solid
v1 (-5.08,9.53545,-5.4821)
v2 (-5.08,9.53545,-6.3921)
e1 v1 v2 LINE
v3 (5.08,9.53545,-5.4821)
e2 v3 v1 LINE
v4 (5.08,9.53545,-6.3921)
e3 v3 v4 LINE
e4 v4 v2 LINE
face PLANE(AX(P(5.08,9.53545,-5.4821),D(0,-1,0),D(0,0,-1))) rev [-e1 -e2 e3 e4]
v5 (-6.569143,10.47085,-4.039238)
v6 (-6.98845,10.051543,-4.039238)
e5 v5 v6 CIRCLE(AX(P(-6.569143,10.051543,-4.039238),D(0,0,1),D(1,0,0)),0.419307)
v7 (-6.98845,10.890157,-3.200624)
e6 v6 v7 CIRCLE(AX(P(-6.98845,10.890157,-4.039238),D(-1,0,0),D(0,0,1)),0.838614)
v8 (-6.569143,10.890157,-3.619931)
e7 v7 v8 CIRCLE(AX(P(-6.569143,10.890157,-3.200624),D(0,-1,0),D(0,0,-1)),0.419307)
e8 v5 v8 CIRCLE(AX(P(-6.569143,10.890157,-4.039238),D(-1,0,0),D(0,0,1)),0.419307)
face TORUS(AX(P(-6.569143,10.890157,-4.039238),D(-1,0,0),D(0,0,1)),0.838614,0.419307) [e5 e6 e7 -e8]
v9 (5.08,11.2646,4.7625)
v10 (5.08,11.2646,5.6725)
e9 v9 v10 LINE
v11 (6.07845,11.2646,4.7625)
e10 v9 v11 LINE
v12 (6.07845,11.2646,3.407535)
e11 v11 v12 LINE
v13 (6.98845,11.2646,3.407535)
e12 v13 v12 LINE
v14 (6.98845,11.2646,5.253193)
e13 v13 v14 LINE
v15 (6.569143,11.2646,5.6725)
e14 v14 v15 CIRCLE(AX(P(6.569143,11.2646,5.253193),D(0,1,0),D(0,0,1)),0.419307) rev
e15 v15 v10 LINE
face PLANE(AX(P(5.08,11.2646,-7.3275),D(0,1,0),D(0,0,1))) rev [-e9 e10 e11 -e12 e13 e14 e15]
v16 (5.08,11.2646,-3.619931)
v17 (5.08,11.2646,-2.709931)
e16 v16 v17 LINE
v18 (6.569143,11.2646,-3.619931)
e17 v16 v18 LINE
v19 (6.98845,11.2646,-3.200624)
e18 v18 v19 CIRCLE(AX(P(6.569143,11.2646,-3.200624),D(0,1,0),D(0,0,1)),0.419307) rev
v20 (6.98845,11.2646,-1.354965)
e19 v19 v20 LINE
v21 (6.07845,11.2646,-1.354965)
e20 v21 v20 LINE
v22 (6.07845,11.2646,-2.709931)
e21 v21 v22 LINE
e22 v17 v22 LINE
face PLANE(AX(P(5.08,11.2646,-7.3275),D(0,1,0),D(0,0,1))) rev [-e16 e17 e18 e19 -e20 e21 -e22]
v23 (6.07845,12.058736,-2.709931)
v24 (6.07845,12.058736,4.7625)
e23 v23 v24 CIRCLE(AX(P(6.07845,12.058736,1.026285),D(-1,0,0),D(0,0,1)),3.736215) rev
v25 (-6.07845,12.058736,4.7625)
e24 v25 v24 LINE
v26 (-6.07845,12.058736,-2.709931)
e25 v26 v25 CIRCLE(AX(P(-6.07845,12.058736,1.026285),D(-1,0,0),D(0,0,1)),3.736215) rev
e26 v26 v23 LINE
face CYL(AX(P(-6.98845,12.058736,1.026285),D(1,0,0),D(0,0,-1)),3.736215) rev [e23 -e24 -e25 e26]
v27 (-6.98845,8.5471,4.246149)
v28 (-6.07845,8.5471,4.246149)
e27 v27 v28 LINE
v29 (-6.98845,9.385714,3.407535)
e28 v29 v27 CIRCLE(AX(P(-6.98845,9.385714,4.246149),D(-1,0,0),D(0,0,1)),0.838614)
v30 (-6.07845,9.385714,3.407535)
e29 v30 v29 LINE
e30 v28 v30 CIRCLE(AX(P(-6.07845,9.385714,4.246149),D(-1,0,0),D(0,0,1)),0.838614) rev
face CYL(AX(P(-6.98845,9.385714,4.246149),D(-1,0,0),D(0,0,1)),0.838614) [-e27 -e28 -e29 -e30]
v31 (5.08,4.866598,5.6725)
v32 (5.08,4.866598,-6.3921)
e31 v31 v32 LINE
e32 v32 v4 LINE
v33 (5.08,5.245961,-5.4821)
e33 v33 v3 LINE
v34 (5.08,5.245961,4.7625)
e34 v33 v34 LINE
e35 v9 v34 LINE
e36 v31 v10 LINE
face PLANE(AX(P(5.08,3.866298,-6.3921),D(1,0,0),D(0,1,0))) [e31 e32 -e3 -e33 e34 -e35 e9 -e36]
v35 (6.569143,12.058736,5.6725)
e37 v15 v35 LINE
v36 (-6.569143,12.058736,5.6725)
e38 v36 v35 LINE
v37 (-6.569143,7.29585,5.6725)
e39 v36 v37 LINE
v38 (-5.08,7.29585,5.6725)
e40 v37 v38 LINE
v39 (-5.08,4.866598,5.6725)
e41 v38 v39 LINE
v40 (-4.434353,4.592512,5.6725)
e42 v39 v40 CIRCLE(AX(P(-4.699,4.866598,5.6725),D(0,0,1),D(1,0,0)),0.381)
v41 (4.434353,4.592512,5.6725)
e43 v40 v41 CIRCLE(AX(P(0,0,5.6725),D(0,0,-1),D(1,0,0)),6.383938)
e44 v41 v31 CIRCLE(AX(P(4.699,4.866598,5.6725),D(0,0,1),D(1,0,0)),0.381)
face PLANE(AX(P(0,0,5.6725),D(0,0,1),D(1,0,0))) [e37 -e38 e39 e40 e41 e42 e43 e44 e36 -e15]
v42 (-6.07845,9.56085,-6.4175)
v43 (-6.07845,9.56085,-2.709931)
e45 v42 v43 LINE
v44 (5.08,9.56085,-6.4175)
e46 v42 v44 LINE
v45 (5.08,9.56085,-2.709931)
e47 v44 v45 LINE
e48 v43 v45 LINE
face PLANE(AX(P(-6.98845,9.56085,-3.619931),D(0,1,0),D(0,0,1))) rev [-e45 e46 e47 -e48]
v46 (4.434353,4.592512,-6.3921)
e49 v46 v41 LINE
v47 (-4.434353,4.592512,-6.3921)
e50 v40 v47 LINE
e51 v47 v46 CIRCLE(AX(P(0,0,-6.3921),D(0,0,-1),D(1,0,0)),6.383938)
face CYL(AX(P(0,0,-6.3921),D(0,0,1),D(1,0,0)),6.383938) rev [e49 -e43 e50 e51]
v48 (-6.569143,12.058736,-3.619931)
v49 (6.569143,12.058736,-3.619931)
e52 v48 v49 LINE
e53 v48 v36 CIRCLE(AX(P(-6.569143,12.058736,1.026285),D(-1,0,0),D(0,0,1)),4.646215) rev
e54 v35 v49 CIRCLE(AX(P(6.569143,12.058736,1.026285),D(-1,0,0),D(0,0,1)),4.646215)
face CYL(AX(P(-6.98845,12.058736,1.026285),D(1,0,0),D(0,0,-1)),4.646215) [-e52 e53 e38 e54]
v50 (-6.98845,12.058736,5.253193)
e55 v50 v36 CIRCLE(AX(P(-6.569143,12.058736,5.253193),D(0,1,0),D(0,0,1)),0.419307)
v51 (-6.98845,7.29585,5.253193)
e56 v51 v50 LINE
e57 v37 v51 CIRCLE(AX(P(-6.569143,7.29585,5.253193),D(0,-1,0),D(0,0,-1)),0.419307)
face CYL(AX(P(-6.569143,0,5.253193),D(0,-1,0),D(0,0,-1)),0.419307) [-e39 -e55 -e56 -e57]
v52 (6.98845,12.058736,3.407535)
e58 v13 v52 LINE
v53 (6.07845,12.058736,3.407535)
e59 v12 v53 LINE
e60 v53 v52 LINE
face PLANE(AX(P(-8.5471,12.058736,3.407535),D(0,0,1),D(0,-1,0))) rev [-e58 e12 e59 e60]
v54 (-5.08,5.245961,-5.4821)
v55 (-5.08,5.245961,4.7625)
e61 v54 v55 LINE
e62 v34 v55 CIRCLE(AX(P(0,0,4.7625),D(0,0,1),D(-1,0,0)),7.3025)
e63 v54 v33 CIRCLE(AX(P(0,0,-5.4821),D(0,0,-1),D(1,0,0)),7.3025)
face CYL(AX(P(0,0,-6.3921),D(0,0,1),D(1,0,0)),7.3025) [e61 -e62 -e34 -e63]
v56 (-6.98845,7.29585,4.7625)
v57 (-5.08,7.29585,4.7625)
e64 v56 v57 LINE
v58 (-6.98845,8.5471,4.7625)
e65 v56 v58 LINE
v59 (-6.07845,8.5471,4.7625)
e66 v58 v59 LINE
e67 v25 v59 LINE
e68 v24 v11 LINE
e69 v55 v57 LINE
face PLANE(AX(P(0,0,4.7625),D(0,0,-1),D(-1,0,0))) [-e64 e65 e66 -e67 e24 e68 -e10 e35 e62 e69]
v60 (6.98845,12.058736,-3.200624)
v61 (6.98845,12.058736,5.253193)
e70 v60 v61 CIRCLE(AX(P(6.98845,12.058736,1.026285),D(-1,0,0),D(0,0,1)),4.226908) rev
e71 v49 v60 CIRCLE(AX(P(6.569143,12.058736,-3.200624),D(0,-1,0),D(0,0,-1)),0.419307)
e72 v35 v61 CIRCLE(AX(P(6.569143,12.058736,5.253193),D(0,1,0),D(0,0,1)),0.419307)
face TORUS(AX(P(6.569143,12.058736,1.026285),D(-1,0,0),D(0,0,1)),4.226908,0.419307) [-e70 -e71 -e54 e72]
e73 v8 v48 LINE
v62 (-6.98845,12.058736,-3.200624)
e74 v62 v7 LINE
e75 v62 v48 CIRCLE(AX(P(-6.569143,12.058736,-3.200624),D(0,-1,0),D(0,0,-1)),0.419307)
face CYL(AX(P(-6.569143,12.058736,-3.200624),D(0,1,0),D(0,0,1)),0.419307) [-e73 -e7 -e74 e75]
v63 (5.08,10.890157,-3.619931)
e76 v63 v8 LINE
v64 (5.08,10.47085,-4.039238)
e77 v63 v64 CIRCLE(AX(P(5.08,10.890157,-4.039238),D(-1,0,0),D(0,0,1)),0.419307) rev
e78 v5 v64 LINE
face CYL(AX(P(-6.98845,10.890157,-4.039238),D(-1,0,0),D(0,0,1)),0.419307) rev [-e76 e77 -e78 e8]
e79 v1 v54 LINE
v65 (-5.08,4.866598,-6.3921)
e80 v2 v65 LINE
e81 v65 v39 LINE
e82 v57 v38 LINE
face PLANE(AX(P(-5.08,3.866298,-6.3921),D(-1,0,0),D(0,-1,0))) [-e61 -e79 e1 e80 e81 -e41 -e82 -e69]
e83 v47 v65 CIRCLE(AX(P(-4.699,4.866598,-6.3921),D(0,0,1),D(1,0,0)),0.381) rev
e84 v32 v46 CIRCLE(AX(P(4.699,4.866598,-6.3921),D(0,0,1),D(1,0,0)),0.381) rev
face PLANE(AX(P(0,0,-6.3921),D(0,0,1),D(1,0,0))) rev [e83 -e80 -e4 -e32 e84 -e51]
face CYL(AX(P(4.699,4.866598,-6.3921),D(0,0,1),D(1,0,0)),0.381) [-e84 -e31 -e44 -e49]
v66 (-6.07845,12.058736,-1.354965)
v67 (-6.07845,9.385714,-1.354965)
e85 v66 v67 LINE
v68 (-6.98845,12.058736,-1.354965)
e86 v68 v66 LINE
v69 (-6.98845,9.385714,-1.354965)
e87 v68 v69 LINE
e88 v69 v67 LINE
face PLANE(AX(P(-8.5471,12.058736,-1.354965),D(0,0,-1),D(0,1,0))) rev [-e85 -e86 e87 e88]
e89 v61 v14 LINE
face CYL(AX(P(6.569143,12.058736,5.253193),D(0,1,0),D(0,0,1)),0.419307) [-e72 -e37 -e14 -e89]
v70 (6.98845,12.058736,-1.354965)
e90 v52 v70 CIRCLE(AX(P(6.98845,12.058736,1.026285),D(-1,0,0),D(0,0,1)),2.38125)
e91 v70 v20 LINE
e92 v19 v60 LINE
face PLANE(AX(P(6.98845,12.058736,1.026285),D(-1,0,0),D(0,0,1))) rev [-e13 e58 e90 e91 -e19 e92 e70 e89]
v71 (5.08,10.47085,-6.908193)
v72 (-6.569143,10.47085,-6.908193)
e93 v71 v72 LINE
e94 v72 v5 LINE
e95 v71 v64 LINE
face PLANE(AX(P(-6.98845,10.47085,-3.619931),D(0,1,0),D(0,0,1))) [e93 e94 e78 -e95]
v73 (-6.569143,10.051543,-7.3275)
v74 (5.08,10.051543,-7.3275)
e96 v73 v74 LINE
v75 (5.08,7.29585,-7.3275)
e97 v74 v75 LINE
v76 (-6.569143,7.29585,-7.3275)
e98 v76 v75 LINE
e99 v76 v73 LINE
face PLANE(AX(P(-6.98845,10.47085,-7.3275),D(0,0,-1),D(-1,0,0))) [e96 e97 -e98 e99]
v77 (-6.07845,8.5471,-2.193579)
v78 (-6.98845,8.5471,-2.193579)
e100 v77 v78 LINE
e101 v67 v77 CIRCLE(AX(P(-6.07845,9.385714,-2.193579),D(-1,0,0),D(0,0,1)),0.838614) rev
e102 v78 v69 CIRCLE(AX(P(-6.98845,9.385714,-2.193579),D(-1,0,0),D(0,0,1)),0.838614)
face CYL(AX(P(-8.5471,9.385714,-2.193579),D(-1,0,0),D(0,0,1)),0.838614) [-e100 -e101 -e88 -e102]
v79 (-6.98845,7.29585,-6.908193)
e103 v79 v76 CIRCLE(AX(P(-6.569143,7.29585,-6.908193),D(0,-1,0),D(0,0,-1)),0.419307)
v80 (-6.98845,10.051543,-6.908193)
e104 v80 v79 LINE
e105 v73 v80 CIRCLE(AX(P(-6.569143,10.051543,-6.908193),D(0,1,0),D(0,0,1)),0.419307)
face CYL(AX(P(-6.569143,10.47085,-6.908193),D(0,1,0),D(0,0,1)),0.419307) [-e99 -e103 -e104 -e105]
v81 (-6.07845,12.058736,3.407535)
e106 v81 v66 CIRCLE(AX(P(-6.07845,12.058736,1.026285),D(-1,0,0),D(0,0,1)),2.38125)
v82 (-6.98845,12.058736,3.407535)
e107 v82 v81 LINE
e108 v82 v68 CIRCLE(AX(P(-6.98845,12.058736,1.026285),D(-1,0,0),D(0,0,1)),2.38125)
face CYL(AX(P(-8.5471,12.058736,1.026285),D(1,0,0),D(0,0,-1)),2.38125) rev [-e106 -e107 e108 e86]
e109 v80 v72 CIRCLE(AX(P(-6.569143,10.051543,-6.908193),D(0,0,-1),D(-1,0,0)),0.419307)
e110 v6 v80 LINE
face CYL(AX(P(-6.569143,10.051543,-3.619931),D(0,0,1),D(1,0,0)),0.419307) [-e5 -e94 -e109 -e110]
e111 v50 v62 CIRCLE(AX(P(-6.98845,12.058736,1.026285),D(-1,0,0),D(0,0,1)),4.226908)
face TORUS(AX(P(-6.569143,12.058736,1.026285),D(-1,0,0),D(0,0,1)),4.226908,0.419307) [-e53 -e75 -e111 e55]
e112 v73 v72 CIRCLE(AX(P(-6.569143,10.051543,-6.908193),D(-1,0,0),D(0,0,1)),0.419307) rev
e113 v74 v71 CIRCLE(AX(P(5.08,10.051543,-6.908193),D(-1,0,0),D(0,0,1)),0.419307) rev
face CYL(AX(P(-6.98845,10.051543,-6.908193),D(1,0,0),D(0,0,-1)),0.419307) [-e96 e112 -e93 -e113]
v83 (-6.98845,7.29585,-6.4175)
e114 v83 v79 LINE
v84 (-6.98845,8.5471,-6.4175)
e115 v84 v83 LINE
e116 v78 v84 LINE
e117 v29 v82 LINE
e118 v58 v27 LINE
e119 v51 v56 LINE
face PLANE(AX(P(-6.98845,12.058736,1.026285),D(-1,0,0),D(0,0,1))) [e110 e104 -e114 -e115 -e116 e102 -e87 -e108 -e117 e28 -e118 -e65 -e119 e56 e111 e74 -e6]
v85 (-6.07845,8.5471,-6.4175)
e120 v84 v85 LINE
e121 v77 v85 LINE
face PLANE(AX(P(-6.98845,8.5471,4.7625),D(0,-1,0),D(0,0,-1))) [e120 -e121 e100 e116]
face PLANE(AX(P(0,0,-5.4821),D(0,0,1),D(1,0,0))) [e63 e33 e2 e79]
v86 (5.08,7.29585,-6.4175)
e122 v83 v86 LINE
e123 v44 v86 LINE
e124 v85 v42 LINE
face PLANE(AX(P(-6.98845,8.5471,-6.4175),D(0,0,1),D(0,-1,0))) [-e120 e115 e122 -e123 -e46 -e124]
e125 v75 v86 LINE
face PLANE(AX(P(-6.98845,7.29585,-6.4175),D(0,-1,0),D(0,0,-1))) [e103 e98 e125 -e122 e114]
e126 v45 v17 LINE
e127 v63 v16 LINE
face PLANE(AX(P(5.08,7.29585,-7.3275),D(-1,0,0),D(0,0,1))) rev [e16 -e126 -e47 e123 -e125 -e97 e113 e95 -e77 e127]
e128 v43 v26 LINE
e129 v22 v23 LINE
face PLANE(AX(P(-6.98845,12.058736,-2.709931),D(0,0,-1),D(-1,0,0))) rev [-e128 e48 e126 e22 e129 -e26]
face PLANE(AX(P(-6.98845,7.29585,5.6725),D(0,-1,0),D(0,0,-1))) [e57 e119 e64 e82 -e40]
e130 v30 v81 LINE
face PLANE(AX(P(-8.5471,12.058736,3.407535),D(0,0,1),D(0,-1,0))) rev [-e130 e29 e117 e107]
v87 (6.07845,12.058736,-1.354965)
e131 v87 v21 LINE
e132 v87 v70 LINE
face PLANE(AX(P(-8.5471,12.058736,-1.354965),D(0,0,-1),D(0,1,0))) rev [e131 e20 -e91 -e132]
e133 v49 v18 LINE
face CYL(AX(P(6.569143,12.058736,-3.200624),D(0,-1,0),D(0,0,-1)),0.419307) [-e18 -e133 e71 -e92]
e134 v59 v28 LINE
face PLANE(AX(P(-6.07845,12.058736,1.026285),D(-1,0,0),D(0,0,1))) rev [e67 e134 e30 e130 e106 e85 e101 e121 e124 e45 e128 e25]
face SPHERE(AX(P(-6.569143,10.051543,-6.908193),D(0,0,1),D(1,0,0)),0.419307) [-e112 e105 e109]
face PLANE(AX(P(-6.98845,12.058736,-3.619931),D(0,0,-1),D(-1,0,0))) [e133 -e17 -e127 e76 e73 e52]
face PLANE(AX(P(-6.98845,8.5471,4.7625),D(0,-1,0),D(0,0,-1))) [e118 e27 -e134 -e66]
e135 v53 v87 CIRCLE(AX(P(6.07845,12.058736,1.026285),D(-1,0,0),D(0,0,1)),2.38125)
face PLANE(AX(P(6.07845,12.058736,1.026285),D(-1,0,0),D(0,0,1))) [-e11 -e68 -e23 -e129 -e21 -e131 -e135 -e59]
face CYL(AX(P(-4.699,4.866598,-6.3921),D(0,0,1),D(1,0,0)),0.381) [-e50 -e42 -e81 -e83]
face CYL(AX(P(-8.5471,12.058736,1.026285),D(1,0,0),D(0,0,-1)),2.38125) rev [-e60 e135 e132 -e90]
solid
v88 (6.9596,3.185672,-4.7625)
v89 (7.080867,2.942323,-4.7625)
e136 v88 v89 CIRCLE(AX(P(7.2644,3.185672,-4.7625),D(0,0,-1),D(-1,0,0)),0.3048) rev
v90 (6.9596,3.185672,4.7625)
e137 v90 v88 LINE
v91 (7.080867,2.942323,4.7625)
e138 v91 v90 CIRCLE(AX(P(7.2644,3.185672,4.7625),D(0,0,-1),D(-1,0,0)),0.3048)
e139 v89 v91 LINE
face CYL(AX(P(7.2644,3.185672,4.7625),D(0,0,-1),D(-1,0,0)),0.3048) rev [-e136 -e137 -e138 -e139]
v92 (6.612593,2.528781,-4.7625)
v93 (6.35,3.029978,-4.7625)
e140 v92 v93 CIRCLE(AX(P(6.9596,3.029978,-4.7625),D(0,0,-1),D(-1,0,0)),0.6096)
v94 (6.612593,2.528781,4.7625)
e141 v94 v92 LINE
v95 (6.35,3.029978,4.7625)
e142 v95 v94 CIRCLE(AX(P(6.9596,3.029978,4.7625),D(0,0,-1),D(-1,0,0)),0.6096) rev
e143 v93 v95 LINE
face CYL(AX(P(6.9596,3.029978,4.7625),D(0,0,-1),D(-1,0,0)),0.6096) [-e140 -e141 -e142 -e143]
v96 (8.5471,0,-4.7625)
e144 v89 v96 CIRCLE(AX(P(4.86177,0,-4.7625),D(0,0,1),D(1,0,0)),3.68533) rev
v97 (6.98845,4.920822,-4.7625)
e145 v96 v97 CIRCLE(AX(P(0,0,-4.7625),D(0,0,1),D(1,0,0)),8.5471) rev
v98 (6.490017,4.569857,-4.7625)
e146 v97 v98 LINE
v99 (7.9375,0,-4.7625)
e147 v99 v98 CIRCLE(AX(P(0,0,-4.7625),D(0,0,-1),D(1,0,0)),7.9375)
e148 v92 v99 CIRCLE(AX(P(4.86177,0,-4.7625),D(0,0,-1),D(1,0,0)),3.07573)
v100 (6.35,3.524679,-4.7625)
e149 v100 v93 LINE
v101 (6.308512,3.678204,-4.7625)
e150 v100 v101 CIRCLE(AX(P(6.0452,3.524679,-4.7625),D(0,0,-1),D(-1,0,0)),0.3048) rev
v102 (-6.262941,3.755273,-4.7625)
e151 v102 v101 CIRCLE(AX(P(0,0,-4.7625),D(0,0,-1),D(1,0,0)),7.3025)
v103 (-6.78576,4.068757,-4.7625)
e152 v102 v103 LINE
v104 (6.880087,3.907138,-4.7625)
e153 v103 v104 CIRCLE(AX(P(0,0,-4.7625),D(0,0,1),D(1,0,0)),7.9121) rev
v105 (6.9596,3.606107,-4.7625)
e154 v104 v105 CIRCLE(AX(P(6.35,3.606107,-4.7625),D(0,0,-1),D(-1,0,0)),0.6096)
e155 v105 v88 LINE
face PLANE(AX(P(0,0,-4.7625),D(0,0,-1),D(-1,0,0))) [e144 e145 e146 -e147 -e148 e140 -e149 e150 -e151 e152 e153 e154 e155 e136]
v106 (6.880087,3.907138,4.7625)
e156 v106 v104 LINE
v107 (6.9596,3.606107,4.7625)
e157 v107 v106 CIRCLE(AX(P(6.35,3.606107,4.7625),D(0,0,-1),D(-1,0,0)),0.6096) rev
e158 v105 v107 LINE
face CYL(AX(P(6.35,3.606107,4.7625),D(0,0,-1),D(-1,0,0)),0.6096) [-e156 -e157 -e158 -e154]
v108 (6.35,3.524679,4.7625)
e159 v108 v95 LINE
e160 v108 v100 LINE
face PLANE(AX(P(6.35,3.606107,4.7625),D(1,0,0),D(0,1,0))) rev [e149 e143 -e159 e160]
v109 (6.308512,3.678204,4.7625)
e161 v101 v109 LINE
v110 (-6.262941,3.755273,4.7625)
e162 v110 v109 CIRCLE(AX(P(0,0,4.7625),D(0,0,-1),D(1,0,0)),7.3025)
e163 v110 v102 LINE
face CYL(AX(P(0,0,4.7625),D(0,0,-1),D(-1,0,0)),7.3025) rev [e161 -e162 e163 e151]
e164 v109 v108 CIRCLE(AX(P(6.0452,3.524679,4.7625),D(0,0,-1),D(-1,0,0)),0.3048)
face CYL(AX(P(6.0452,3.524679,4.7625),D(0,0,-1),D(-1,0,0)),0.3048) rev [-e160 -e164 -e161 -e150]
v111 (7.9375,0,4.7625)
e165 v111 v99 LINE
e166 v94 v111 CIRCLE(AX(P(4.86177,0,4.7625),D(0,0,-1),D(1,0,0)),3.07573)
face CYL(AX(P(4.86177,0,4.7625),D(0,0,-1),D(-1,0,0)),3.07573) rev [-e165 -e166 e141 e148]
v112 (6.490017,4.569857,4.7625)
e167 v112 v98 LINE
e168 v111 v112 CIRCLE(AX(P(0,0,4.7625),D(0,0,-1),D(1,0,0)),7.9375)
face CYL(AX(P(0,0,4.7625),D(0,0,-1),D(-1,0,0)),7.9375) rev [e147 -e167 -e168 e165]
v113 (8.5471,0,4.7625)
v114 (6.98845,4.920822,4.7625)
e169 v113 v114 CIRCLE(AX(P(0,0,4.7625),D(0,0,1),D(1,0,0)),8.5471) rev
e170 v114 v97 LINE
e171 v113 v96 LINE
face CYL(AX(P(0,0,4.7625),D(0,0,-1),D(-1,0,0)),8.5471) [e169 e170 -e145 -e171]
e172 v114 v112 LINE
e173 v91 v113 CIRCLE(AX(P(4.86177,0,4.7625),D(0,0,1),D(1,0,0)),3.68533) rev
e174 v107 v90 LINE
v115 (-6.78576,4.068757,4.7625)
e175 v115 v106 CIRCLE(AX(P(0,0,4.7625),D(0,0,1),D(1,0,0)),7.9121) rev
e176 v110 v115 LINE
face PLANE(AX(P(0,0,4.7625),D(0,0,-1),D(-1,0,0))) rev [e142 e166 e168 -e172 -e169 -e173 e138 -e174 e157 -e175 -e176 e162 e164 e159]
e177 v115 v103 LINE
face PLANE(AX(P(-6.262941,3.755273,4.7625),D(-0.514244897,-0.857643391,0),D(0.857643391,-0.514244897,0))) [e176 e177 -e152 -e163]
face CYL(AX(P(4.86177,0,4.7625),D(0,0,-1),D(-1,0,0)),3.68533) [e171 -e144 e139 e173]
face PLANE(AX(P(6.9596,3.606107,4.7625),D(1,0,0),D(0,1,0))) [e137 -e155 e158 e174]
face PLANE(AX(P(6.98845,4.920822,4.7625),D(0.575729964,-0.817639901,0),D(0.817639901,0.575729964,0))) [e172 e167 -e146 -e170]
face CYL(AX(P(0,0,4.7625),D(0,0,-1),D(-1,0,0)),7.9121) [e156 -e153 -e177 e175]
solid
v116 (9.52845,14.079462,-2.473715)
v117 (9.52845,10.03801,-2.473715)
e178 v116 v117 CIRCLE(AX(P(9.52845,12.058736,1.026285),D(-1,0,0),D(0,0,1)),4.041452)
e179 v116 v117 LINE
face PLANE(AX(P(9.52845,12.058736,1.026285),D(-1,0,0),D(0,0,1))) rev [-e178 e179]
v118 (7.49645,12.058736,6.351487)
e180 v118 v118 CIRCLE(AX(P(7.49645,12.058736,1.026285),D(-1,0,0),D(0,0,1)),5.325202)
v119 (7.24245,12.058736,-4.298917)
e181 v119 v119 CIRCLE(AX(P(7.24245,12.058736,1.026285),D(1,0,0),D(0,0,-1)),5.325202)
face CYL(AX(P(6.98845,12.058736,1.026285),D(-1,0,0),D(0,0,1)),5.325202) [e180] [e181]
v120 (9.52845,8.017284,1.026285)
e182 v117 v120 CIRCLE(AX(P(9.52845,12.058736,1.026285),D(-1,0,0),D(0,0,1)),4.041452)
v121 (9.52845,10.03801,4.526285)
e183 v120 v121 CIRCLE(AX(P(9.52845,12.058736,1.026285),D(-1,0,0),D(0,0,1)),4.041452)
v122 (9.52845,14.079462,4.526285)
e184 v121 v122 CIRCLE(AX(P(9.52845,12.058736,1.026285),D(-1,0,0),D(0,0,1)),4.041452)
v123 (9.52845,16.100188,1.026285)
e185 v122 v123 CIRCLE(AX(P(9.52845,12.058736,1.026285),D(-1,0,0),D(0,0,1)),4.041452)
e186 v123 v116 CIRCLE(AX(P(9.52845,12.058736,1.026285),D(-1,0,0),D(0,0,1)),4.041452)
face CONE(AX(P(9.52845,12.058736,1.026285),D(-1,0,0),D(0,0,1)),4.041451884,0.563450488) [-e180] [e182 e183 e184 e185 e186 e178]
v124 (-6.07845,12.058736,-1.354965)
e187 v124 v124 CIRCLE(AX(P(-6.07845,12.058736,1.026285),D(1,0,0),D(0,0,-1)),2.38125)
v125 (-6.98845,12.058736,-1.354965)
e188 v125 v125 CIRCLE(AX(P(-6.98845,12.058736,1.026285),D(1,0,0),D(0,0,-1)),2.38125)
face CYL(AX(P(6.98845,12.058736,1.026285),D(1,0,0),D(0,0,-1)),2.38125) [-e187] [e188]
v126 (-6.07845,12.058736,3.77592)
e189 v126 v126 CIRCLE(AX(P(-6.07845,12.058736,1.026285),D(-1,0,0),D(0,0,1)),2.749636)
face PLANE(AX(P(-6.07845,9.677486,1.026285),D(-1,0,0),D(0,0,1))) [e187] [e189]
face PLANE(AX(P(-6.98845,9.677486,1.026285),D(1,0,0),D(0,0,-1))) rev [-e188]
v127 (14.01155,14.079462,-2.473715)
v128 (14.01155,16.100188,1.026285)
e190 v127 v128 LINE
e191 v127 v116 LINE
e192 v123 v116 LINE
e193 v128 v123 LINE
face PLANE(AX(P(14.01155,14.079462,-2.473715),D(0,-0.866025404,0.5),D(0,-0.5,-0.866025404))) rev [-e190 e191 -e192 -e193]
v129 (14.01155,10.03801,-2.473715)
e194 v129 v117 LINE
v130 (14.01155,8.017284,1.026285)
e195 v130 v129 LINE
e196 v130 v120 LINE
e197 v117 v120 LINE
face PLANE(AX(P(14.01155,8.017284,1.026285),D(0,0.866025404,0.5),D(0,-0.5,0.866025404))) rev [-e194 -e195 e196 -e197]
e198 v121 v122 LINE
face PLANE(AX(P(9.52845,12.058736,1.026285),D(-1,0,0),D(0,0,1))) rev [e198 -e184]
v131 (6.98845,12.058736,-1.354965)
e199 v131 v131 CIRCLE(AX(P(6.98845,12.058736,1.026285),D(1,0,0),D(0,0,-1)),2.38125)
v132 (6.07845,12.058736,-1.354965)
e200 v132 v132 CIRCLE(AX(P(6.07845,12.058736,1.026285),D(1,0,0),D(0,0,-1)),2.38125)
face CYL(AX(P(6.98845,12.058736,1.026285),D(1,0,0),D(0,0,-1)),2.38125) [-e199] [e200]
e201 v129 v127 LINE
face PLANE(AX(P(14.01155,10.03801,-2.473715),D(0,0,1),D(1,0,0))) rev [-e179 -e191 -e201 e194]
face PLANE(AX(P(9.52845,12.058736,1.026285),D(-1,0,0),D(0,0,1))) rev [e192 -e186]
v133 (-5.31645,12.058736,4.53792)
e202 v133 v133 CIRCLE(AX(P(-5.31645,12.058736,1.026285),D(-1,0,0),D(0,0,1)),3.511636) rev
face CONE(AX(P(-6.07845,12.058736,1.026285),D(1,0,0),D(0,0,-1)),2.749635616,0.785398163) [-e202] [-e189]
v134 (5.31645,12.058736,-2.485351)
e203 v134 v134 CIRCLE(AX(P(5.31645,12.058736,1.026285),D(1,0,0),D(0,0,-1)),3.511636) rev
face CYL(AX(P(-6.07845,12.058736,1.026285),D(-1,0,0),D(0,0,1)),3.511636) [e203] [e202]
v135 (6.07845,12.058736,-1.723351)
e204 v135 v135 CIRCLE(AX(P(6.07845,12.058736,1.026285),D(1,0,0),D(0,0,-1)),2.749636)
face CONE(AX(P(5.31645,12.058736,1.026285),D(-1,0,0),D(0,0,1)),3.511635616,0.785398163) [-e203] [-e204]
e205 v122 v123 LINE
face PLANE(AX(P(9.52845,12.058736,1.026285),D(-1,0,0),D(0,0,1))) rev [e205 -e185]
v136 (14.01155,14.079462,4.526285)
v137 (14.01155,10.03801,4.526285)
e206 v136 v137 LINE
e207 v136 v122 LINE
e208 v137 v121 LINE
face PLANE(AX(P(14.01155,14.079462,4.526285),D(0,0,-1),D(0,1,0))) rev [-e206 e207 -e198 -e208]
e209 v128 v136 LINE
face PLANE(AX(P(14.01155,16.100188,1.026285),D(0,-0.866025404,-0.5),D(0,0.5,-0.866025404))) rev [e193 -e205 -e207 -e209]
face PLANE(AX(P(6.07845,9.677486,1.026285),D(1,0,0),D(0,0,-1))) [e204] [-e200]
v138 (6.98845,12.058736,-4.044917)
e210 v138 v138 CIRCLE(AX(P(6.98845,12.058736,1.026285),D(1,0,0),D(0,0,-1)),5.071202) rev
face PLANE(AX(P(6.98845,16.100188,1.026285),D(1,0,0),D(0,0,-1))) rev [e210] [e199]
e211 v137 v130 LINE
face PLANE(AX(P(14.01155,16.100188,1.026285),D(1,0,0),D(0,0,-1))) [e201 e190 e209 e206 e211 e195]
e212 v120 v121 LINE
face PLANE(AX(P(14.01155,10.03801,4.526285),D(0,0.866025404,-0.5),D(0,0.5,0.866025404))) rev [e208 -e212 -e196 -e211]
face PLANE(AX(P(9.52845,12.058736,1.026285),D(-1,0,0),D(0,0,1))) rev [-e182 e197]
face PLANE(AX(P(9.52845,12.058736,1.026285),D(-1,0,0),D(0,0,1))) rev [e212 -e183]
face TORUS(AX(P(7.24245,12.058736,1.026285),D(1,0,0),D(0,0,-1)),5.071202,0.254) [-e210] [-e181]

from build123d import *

# Parameters (mm, degrees)
EXTRUDE_THIN1_DEPTH      = 4.7625
BOSS_EXTRUDE1_DEPTH      = 6.98845
BOSS_EXTRUDE1_DEPTH_BACK = 6.98845
SHELL2_START             = -6.07845
SHELL2_DEPTH             = 12.1569
BOSS_EXTRUDE2_DEPTH      = 5.6725
BOSS_EXTRUDE2_DEPTH_BACK = 6.3921
BOSS_EXTRUDE9_START      = -0.91
BOSS_EXTRUDE9_DEPTH      = 0.91
BOSS_EXTRUDE10_START     = 0.91
BOSS_EXTRUDE10_DEPTH     = 0.91
CUT_EXTRUDE3_DEPTH       = 21.144492034
CUT_EXTRUDE3_DEPTH_BACK  = 21.144492034
FILLET3_R                = 0.419307
FILLET8_R                = 0.838614
CHAMFER2_SIZE            = 0.762
SKETCH31_W               = 0.91
SKETCH31_H               = 2.38125
BOSS_EXTRUDE7_DEPTH      = 7.0231
FILLET6_R                = 0.254
CUT_EXTRUDE4_DEPTH       = 24.499299408
CUT_EXTRUDE4_DEPTH_BACK  = 24.499299408
SKETCH35_W               = 1.90845
SKETCH35_H               = 3.96875
FILLET7_R                = 0.381
FILLET9_R                = 0.3048
FILLET10_R               = 0.6096


# Read off the part's stored shape, not the designer's step: Shell2
with BuildPart() as part:
    # Sketch2 → Extrude-Thin1 (new, symmetric)
    with BuildSketch(Plane.XY):
        with BuildLine():
            ThreePointArc((-6.262940862, 3.755273359), (0.086356754, 7.30198937), (6.35, 3.6061068))
            Line((6.35, 3.6061068), (6.35, 2.6917068))
            ThreePointArc((6.35, 2.6917068), (7.511063175, 1.56248534), (7.9375, 0))
            ThreePointArc((7.9375, 0), (-7.566981364, -2.396810231), (6.490016716, 4.569856592))
            Line((6.490016716, 4.569856592), (6.98845, 4.920821579))
            ThreePointArc((6.98845, 4.920821579), (-8.148125533, -2.580885257), (8.5471, 0))
            ThreePointArc((8.5471, 0), (8.126188249, 1.710330505), (6.9596, 3.029977804))
            Line((6.9596, 3.029977804), (6.9596, 3.763680944))
            ThreePointArc((6.9596, 3.763680944), (0.175564575, 7.910151926), (-6.785760274, 4.068757049))
            Line((-6.785760274, 4.068757049), (-6.262940862, 3.755273359))
        make_face()
    extrude(amount=EXTRUDE_THIN1_DEPTH, both=True)

    # Fillet9
    fillet9_edges = [part.edges().sort_by_distance(p)[0] for p in [
        (6.35, 3.6061068, 0),
        (6.9596, 3.029977804, 0),
    ]]
    fillet(fillet9_edges, radius=FILLET9_R)

    # Fillet10
    fillet10_edges = [part.edges().sort_by_distance(p)[0] for p in [
        (6.35, 2.6917068, 0),
        (6.9596, 3.763680944, 0),
    ]]
    fillet(fillet10_edges, radius=FILLET10_R)


with BuildPart() as body_2:
    # Sketch3 → Boss-Extrude1 (new, two sides: drawn at the far end of the back side and taken through both)
    with BuildSketch(Plane(origin=(0, 0, 0), x_dir=(0, 0, -1), z_dir=(1, 0, 0)).offset(-BOSS_EXTRUDE1_DEPTH_BACK)):
        with BuildLine():
            Line((-5.6725, 8.5471), (-5.6725, 7.29585))
            Line((-5.6725, 7.29585), (-4.7625, 7.29585))
            Line((-4.7625, 7.29585), (-4.7625, 8.5471))
            Line((-4.7625, 8.5471), (6.4175, 8.5471))
            Line((6.4175, 8.5471), (6.4175, 7.29585))
            Line((6.4175, 7.29585), (7.3275, 7.29585))
            Line((7.3275, 7.29585), (7.3275, 8.5471))
            Line((7.3275, 8.5471), (7.3275, 10.47085))
            Line((7.3275, 10.47085), (3.619930574, 10.47085))
            Line((3.619930574, 10.47085), (3.619930574, 12.058735616))
            ThreePointArc((3.619930574, 12.058735616), (-1.026284713, 16.704950903), (-5.6725, 12.058735616))
            Line((-5.6725, 12.058735616), (-5.6725, 10.47085))
            Line((-5.6725, 10.47085), (-5.6725, 8.5471))
        make_face()
    extrude(amount=BOSS_EXTRUDE1_DEPTH + BOSS_EXTRUDE1_DEPTH_BACK)

    # Shell2 outline → Shell2 (cut)
    with BuildSketch(Plane.YZ.offset(SHELL2_START)):
        with BuildLine():
            Line((8.5471, -6.4175), (9.56085, -6.4175))
            Line((9.56085, -6.4175), (9.56085, -2.709930574))
            Line((9.56085, -2.709930574), (12.058735616, -2.709930574))
            ThreePointArc((12.058735616, -2.709930574), (15.794950903, 1.026284713), (12.058735616, 4.7625))
            Line((12.058735616, 4.7625), (8.5471, 4.7625))
            Line((8.5471, 4.7625), (8.5471, -6.4175))
        make_face()
    extrude(amount=SHELL2_DEPTH, mode=Mode.SUBTRACT)


with BuildPart() as body_3:
    # Sketch4 → Boss-Extrude2 (new, two sides: drawn at the far end of the back side and taken through both)
    with BuildSketch(Plane.XY.offset(-BOSS_EXTRUDE2_DEPTH_BACK)):
        with BuildLine():
            Line((-5.08, 3.866297713), (-5.08, 5.245960946))
            ThreePointArc((-5.08, 5.245960946), (0, 7.3025), (5.08, 5.245960946))
            Line((5.08, 5.245960946), (5.08, 3.866297713))
            ThreePointArc((5.08, 3.866297713), (0, 6.3839375), (-5.08, 3.866297713))
        make_face()
    extrude(amount=BOSS_EXTRUDE2_DEPTH + BOSS_EXTRUDE2_DEPTH_BACK)


    add(body_2.part)  # Boss-Extrude9 merges body 2
    # Sketch6 → Boss-Extrude9 (add)
    with BuildSketch(Plane(origin=(0, 0, 4.7625), x_dir=(-1, 0, 0), z_dir=(0, 0, -1)).offset(BOSS_EXTRUDE9_START)):
        with BuildLine():
            Line((-5.08, 5.245960946), (-5.08, 9.56085))
            Line((-5.08, 9.56085), (5.08, 9.56085))
            Line((5.08, 9.56085), (5.08, 5.245960946))
            ThreePointArc((5.08, 5.245960946), (0, 7.3025), (-5.08, 5.245960946))
        make_face()
    extrude(amount=BOSS_EXTRUDE9_DEPTH)

    # Sketch7 → Boss-Extrude10 (add)
    with BuildSketch(Plane.XY.offset(-6.3921).offset(BOSS_EXTRUDE10_START)):
        with BuildLine():
            Line((5.08, 9.53545), (-5.08, 9.53545))
            Line((-5.08, 9.53545), (-5.08, 5.245960946))
            ThreePointArc((-5.08, 5.245960946), (0, 7.3025), (5.08, 5.245960946))
            Line((5.08, 5.245960946), (5.08, 9.53545))
        make_face()
    extrude(amount=-BOSS_EXTRUDE10_DEPTH)

    # Sketch25 → Cut-Extrude3 (cut, two sides: drawn at the far end of the back side and taken through both)
    with BuildSketch(Plane(origin=(0, 0, 0), x_dir=(0, 0, -1), z_dir=(1, 0, 0)).offset(-CUT_EXTRUDE3_DEPTH_BACK)):
        with BuildLine():
            Line((-3.407534713, 12.058735616), (-3.407534713, 8.5471))
            Line((-3.407534713, 8.5471), (1.354965287, 8.5471))
            Line((1.354965287, 8.5471), (1.354965287, 12.058735616))
            ThreePointArc((1.354965287, 12.058735616), (-1.026284713, 14.439985616), (-3.407534713, 12.058735616))
        make_face()
    extrude(amount=CUT_EXTRUDE3_DEPTH + CUT_EXTRUDE3_DEPTH_BACK, mode=Mode.SUBTRACT)

    # Fillet3
    fillet3_edges = [body_3.edges().sort_by_distance(p)[0] for p in [
        (-6.98845, 9.677292808, 5.6725),
        (-6.98845, 16.704950903, 1.026284713),
        (-6.98845, 11.264792808, -3.619930574),
        (0, 10.47085, -3.619930574),
        (-6.98845, 10.47085, -5.473715287),
        (0, 10.47085, -7.3275),
        (-6.98845, 8.88335, -7.3275),
        (6.98845, 9.677292808, 5.6725),
        (6.98845, 10.47085, -5.473715287),
        (6.98845, 11.264792808, -3.619930574),
        (6.98845, 16.704950903, 1.026284713),
    ]]
    fillet(fillet3_edges, radius=FILLET3_R)

    # Fillet8
    fillet8_edges = [body_3.edges().sort_by_distance(p)[0] for p in [
        (6.53345, 8.5471, -1.354965287),
        (-6.53345, 8.5471, -1.354965287),
        (6.53345, 8.5471, 3.407534713),
        (-6.53345, 8.5471, 3.407534713),
    ]]
    fillet(fillet8_edges, radius=FILLET8_R)

    # Sketch35 → Cut-Extrude4 (cut, two sides: drawn at the far end of the back side and taken through both)
    with BuildSketch(Plane.XY.offset(-CUT_EXTRUDE4_DEPTH_BACK)):
        with Locations((6.034225, 9.280225)):
            Rectangle(SKETCH35_W, SKETCH35_H)
    extrude(amount=CUT_EXTRUDE4_DEPTH + CUT_EXTRUDE4_DEPTH_BACK, mode=Mode.SUBTRACT)

    # Fillet7
    fillet7_edges = [body_3.edges().sort_by_distance(p)[0] for p in [
        (-5.08, 3.866297713, -0.3598),
        (5.08, 3.866297713, -0.3598),
    ]]
    fillet(fillet7_edges, radius=FILLET7_R)


with BuildPart() as body_3_2:
    # Sketch10 → Revolve1 (revolve)
    with BuildSketch(Plane.XY.offset(1.026284713), mode=Mode.PRIVATE) as revolve1_sk:
        Polygon((-6.07845, 9.677485616), (-6.07845, 12.058735616), (6.07845, 12.058735616), (6.07845, 9.677485616), (6.07845, 8.5471), (-6.07845, 8.5471), align=None)
    revolve(revolve1_sk.sketch.rotate(Axis((-6.07845, 12.058735616, 1.026284713), (1, 0, 0)), 270), axis=Axis((-6.07845, 12.058735616, 1.026284713), (1, 0, 0)))

    # Chamfer2
    chamfer2_edges = [body_3_2.edges().sort_by_distance(p)[0] for p in [
        (-6.07845, 12.058735616, -2.485350903),
        (6.07845, 12.058735616, -2.485350903),
    ]]
    chamfer(chamfer2_edges, length=CHAMFER2_SIZE)

    # Sketch31 → Revolve3 (revolve)
    with BuildSketch(Plane.XY.offset(1.026284713), mode=Mode.PRIVATE) as revolve3_sk:
        with Locations((-6.53345, 10.868110616)):
            Rectangle(SKETCH31_W, SKETCH31_H)
        with Locations((6.53345, 10.868110616)):
            Rectangle(SKETCH31_W, SKETCH31_H)
    revolve(revolve3_sk.sketch.rotate(Axis((6.98845, 12.058735616, 1.026284713), (-1, 0, 0)), 270), axis=Axis((6.98845, 12.058735616, 1.026284713), (-1, 0, 0)))

    # Sketch13 → Boss-Extrude7 (add)
    with BuildSketch(Plane(origin=(6.98845, 0, 0), x_dir=(0, 0, -1), z_dir=(1, 0, 0))):
        Polygon((-1.026284713, 16.1001875), (-4.526284713, 14.079461558), (-4.526284713, 10.038009674), (-1.026284713, 8.017283731), (2.473715287, 10.038009674), (2.473715287, 14.079461558), align=None)
    extrude(amount=BOSS_EXTRUDE7_DEPTH)

    # Sketch19 → Revolve2 (revolve)
    with BuildSketch(Plane.XY.offset(1.026284713), mode=Mode.PRIVATE) as revolve2_sk:
        Polygon((9.52845, 12.058735616), (9.52845, 16.1001875), (7.49645, 17.3839375), (6.98845, 17.3839375), (6.98845, 12.058735616), align=None)
    revolve(revolve2_sk.sketch.rotate(Axis((6.98845, 12.058735616, 1.026284713), (1, 0, 0)), 90), axis=Axis((6.98845, 12.058735616, 1.026284713), (1, 0, 0)))

    # Fillet6
    fillet6_edges = [body_3_2.edges().sort_by_distance(p)[0] for p in [
        (6.98845, 12.058735616, -4.298917171),
    ]]
    fillet(fillet6_edges, radius=FILLET6_R)


solid = Compound([part.part, body_3.part, body_3_2.part])
